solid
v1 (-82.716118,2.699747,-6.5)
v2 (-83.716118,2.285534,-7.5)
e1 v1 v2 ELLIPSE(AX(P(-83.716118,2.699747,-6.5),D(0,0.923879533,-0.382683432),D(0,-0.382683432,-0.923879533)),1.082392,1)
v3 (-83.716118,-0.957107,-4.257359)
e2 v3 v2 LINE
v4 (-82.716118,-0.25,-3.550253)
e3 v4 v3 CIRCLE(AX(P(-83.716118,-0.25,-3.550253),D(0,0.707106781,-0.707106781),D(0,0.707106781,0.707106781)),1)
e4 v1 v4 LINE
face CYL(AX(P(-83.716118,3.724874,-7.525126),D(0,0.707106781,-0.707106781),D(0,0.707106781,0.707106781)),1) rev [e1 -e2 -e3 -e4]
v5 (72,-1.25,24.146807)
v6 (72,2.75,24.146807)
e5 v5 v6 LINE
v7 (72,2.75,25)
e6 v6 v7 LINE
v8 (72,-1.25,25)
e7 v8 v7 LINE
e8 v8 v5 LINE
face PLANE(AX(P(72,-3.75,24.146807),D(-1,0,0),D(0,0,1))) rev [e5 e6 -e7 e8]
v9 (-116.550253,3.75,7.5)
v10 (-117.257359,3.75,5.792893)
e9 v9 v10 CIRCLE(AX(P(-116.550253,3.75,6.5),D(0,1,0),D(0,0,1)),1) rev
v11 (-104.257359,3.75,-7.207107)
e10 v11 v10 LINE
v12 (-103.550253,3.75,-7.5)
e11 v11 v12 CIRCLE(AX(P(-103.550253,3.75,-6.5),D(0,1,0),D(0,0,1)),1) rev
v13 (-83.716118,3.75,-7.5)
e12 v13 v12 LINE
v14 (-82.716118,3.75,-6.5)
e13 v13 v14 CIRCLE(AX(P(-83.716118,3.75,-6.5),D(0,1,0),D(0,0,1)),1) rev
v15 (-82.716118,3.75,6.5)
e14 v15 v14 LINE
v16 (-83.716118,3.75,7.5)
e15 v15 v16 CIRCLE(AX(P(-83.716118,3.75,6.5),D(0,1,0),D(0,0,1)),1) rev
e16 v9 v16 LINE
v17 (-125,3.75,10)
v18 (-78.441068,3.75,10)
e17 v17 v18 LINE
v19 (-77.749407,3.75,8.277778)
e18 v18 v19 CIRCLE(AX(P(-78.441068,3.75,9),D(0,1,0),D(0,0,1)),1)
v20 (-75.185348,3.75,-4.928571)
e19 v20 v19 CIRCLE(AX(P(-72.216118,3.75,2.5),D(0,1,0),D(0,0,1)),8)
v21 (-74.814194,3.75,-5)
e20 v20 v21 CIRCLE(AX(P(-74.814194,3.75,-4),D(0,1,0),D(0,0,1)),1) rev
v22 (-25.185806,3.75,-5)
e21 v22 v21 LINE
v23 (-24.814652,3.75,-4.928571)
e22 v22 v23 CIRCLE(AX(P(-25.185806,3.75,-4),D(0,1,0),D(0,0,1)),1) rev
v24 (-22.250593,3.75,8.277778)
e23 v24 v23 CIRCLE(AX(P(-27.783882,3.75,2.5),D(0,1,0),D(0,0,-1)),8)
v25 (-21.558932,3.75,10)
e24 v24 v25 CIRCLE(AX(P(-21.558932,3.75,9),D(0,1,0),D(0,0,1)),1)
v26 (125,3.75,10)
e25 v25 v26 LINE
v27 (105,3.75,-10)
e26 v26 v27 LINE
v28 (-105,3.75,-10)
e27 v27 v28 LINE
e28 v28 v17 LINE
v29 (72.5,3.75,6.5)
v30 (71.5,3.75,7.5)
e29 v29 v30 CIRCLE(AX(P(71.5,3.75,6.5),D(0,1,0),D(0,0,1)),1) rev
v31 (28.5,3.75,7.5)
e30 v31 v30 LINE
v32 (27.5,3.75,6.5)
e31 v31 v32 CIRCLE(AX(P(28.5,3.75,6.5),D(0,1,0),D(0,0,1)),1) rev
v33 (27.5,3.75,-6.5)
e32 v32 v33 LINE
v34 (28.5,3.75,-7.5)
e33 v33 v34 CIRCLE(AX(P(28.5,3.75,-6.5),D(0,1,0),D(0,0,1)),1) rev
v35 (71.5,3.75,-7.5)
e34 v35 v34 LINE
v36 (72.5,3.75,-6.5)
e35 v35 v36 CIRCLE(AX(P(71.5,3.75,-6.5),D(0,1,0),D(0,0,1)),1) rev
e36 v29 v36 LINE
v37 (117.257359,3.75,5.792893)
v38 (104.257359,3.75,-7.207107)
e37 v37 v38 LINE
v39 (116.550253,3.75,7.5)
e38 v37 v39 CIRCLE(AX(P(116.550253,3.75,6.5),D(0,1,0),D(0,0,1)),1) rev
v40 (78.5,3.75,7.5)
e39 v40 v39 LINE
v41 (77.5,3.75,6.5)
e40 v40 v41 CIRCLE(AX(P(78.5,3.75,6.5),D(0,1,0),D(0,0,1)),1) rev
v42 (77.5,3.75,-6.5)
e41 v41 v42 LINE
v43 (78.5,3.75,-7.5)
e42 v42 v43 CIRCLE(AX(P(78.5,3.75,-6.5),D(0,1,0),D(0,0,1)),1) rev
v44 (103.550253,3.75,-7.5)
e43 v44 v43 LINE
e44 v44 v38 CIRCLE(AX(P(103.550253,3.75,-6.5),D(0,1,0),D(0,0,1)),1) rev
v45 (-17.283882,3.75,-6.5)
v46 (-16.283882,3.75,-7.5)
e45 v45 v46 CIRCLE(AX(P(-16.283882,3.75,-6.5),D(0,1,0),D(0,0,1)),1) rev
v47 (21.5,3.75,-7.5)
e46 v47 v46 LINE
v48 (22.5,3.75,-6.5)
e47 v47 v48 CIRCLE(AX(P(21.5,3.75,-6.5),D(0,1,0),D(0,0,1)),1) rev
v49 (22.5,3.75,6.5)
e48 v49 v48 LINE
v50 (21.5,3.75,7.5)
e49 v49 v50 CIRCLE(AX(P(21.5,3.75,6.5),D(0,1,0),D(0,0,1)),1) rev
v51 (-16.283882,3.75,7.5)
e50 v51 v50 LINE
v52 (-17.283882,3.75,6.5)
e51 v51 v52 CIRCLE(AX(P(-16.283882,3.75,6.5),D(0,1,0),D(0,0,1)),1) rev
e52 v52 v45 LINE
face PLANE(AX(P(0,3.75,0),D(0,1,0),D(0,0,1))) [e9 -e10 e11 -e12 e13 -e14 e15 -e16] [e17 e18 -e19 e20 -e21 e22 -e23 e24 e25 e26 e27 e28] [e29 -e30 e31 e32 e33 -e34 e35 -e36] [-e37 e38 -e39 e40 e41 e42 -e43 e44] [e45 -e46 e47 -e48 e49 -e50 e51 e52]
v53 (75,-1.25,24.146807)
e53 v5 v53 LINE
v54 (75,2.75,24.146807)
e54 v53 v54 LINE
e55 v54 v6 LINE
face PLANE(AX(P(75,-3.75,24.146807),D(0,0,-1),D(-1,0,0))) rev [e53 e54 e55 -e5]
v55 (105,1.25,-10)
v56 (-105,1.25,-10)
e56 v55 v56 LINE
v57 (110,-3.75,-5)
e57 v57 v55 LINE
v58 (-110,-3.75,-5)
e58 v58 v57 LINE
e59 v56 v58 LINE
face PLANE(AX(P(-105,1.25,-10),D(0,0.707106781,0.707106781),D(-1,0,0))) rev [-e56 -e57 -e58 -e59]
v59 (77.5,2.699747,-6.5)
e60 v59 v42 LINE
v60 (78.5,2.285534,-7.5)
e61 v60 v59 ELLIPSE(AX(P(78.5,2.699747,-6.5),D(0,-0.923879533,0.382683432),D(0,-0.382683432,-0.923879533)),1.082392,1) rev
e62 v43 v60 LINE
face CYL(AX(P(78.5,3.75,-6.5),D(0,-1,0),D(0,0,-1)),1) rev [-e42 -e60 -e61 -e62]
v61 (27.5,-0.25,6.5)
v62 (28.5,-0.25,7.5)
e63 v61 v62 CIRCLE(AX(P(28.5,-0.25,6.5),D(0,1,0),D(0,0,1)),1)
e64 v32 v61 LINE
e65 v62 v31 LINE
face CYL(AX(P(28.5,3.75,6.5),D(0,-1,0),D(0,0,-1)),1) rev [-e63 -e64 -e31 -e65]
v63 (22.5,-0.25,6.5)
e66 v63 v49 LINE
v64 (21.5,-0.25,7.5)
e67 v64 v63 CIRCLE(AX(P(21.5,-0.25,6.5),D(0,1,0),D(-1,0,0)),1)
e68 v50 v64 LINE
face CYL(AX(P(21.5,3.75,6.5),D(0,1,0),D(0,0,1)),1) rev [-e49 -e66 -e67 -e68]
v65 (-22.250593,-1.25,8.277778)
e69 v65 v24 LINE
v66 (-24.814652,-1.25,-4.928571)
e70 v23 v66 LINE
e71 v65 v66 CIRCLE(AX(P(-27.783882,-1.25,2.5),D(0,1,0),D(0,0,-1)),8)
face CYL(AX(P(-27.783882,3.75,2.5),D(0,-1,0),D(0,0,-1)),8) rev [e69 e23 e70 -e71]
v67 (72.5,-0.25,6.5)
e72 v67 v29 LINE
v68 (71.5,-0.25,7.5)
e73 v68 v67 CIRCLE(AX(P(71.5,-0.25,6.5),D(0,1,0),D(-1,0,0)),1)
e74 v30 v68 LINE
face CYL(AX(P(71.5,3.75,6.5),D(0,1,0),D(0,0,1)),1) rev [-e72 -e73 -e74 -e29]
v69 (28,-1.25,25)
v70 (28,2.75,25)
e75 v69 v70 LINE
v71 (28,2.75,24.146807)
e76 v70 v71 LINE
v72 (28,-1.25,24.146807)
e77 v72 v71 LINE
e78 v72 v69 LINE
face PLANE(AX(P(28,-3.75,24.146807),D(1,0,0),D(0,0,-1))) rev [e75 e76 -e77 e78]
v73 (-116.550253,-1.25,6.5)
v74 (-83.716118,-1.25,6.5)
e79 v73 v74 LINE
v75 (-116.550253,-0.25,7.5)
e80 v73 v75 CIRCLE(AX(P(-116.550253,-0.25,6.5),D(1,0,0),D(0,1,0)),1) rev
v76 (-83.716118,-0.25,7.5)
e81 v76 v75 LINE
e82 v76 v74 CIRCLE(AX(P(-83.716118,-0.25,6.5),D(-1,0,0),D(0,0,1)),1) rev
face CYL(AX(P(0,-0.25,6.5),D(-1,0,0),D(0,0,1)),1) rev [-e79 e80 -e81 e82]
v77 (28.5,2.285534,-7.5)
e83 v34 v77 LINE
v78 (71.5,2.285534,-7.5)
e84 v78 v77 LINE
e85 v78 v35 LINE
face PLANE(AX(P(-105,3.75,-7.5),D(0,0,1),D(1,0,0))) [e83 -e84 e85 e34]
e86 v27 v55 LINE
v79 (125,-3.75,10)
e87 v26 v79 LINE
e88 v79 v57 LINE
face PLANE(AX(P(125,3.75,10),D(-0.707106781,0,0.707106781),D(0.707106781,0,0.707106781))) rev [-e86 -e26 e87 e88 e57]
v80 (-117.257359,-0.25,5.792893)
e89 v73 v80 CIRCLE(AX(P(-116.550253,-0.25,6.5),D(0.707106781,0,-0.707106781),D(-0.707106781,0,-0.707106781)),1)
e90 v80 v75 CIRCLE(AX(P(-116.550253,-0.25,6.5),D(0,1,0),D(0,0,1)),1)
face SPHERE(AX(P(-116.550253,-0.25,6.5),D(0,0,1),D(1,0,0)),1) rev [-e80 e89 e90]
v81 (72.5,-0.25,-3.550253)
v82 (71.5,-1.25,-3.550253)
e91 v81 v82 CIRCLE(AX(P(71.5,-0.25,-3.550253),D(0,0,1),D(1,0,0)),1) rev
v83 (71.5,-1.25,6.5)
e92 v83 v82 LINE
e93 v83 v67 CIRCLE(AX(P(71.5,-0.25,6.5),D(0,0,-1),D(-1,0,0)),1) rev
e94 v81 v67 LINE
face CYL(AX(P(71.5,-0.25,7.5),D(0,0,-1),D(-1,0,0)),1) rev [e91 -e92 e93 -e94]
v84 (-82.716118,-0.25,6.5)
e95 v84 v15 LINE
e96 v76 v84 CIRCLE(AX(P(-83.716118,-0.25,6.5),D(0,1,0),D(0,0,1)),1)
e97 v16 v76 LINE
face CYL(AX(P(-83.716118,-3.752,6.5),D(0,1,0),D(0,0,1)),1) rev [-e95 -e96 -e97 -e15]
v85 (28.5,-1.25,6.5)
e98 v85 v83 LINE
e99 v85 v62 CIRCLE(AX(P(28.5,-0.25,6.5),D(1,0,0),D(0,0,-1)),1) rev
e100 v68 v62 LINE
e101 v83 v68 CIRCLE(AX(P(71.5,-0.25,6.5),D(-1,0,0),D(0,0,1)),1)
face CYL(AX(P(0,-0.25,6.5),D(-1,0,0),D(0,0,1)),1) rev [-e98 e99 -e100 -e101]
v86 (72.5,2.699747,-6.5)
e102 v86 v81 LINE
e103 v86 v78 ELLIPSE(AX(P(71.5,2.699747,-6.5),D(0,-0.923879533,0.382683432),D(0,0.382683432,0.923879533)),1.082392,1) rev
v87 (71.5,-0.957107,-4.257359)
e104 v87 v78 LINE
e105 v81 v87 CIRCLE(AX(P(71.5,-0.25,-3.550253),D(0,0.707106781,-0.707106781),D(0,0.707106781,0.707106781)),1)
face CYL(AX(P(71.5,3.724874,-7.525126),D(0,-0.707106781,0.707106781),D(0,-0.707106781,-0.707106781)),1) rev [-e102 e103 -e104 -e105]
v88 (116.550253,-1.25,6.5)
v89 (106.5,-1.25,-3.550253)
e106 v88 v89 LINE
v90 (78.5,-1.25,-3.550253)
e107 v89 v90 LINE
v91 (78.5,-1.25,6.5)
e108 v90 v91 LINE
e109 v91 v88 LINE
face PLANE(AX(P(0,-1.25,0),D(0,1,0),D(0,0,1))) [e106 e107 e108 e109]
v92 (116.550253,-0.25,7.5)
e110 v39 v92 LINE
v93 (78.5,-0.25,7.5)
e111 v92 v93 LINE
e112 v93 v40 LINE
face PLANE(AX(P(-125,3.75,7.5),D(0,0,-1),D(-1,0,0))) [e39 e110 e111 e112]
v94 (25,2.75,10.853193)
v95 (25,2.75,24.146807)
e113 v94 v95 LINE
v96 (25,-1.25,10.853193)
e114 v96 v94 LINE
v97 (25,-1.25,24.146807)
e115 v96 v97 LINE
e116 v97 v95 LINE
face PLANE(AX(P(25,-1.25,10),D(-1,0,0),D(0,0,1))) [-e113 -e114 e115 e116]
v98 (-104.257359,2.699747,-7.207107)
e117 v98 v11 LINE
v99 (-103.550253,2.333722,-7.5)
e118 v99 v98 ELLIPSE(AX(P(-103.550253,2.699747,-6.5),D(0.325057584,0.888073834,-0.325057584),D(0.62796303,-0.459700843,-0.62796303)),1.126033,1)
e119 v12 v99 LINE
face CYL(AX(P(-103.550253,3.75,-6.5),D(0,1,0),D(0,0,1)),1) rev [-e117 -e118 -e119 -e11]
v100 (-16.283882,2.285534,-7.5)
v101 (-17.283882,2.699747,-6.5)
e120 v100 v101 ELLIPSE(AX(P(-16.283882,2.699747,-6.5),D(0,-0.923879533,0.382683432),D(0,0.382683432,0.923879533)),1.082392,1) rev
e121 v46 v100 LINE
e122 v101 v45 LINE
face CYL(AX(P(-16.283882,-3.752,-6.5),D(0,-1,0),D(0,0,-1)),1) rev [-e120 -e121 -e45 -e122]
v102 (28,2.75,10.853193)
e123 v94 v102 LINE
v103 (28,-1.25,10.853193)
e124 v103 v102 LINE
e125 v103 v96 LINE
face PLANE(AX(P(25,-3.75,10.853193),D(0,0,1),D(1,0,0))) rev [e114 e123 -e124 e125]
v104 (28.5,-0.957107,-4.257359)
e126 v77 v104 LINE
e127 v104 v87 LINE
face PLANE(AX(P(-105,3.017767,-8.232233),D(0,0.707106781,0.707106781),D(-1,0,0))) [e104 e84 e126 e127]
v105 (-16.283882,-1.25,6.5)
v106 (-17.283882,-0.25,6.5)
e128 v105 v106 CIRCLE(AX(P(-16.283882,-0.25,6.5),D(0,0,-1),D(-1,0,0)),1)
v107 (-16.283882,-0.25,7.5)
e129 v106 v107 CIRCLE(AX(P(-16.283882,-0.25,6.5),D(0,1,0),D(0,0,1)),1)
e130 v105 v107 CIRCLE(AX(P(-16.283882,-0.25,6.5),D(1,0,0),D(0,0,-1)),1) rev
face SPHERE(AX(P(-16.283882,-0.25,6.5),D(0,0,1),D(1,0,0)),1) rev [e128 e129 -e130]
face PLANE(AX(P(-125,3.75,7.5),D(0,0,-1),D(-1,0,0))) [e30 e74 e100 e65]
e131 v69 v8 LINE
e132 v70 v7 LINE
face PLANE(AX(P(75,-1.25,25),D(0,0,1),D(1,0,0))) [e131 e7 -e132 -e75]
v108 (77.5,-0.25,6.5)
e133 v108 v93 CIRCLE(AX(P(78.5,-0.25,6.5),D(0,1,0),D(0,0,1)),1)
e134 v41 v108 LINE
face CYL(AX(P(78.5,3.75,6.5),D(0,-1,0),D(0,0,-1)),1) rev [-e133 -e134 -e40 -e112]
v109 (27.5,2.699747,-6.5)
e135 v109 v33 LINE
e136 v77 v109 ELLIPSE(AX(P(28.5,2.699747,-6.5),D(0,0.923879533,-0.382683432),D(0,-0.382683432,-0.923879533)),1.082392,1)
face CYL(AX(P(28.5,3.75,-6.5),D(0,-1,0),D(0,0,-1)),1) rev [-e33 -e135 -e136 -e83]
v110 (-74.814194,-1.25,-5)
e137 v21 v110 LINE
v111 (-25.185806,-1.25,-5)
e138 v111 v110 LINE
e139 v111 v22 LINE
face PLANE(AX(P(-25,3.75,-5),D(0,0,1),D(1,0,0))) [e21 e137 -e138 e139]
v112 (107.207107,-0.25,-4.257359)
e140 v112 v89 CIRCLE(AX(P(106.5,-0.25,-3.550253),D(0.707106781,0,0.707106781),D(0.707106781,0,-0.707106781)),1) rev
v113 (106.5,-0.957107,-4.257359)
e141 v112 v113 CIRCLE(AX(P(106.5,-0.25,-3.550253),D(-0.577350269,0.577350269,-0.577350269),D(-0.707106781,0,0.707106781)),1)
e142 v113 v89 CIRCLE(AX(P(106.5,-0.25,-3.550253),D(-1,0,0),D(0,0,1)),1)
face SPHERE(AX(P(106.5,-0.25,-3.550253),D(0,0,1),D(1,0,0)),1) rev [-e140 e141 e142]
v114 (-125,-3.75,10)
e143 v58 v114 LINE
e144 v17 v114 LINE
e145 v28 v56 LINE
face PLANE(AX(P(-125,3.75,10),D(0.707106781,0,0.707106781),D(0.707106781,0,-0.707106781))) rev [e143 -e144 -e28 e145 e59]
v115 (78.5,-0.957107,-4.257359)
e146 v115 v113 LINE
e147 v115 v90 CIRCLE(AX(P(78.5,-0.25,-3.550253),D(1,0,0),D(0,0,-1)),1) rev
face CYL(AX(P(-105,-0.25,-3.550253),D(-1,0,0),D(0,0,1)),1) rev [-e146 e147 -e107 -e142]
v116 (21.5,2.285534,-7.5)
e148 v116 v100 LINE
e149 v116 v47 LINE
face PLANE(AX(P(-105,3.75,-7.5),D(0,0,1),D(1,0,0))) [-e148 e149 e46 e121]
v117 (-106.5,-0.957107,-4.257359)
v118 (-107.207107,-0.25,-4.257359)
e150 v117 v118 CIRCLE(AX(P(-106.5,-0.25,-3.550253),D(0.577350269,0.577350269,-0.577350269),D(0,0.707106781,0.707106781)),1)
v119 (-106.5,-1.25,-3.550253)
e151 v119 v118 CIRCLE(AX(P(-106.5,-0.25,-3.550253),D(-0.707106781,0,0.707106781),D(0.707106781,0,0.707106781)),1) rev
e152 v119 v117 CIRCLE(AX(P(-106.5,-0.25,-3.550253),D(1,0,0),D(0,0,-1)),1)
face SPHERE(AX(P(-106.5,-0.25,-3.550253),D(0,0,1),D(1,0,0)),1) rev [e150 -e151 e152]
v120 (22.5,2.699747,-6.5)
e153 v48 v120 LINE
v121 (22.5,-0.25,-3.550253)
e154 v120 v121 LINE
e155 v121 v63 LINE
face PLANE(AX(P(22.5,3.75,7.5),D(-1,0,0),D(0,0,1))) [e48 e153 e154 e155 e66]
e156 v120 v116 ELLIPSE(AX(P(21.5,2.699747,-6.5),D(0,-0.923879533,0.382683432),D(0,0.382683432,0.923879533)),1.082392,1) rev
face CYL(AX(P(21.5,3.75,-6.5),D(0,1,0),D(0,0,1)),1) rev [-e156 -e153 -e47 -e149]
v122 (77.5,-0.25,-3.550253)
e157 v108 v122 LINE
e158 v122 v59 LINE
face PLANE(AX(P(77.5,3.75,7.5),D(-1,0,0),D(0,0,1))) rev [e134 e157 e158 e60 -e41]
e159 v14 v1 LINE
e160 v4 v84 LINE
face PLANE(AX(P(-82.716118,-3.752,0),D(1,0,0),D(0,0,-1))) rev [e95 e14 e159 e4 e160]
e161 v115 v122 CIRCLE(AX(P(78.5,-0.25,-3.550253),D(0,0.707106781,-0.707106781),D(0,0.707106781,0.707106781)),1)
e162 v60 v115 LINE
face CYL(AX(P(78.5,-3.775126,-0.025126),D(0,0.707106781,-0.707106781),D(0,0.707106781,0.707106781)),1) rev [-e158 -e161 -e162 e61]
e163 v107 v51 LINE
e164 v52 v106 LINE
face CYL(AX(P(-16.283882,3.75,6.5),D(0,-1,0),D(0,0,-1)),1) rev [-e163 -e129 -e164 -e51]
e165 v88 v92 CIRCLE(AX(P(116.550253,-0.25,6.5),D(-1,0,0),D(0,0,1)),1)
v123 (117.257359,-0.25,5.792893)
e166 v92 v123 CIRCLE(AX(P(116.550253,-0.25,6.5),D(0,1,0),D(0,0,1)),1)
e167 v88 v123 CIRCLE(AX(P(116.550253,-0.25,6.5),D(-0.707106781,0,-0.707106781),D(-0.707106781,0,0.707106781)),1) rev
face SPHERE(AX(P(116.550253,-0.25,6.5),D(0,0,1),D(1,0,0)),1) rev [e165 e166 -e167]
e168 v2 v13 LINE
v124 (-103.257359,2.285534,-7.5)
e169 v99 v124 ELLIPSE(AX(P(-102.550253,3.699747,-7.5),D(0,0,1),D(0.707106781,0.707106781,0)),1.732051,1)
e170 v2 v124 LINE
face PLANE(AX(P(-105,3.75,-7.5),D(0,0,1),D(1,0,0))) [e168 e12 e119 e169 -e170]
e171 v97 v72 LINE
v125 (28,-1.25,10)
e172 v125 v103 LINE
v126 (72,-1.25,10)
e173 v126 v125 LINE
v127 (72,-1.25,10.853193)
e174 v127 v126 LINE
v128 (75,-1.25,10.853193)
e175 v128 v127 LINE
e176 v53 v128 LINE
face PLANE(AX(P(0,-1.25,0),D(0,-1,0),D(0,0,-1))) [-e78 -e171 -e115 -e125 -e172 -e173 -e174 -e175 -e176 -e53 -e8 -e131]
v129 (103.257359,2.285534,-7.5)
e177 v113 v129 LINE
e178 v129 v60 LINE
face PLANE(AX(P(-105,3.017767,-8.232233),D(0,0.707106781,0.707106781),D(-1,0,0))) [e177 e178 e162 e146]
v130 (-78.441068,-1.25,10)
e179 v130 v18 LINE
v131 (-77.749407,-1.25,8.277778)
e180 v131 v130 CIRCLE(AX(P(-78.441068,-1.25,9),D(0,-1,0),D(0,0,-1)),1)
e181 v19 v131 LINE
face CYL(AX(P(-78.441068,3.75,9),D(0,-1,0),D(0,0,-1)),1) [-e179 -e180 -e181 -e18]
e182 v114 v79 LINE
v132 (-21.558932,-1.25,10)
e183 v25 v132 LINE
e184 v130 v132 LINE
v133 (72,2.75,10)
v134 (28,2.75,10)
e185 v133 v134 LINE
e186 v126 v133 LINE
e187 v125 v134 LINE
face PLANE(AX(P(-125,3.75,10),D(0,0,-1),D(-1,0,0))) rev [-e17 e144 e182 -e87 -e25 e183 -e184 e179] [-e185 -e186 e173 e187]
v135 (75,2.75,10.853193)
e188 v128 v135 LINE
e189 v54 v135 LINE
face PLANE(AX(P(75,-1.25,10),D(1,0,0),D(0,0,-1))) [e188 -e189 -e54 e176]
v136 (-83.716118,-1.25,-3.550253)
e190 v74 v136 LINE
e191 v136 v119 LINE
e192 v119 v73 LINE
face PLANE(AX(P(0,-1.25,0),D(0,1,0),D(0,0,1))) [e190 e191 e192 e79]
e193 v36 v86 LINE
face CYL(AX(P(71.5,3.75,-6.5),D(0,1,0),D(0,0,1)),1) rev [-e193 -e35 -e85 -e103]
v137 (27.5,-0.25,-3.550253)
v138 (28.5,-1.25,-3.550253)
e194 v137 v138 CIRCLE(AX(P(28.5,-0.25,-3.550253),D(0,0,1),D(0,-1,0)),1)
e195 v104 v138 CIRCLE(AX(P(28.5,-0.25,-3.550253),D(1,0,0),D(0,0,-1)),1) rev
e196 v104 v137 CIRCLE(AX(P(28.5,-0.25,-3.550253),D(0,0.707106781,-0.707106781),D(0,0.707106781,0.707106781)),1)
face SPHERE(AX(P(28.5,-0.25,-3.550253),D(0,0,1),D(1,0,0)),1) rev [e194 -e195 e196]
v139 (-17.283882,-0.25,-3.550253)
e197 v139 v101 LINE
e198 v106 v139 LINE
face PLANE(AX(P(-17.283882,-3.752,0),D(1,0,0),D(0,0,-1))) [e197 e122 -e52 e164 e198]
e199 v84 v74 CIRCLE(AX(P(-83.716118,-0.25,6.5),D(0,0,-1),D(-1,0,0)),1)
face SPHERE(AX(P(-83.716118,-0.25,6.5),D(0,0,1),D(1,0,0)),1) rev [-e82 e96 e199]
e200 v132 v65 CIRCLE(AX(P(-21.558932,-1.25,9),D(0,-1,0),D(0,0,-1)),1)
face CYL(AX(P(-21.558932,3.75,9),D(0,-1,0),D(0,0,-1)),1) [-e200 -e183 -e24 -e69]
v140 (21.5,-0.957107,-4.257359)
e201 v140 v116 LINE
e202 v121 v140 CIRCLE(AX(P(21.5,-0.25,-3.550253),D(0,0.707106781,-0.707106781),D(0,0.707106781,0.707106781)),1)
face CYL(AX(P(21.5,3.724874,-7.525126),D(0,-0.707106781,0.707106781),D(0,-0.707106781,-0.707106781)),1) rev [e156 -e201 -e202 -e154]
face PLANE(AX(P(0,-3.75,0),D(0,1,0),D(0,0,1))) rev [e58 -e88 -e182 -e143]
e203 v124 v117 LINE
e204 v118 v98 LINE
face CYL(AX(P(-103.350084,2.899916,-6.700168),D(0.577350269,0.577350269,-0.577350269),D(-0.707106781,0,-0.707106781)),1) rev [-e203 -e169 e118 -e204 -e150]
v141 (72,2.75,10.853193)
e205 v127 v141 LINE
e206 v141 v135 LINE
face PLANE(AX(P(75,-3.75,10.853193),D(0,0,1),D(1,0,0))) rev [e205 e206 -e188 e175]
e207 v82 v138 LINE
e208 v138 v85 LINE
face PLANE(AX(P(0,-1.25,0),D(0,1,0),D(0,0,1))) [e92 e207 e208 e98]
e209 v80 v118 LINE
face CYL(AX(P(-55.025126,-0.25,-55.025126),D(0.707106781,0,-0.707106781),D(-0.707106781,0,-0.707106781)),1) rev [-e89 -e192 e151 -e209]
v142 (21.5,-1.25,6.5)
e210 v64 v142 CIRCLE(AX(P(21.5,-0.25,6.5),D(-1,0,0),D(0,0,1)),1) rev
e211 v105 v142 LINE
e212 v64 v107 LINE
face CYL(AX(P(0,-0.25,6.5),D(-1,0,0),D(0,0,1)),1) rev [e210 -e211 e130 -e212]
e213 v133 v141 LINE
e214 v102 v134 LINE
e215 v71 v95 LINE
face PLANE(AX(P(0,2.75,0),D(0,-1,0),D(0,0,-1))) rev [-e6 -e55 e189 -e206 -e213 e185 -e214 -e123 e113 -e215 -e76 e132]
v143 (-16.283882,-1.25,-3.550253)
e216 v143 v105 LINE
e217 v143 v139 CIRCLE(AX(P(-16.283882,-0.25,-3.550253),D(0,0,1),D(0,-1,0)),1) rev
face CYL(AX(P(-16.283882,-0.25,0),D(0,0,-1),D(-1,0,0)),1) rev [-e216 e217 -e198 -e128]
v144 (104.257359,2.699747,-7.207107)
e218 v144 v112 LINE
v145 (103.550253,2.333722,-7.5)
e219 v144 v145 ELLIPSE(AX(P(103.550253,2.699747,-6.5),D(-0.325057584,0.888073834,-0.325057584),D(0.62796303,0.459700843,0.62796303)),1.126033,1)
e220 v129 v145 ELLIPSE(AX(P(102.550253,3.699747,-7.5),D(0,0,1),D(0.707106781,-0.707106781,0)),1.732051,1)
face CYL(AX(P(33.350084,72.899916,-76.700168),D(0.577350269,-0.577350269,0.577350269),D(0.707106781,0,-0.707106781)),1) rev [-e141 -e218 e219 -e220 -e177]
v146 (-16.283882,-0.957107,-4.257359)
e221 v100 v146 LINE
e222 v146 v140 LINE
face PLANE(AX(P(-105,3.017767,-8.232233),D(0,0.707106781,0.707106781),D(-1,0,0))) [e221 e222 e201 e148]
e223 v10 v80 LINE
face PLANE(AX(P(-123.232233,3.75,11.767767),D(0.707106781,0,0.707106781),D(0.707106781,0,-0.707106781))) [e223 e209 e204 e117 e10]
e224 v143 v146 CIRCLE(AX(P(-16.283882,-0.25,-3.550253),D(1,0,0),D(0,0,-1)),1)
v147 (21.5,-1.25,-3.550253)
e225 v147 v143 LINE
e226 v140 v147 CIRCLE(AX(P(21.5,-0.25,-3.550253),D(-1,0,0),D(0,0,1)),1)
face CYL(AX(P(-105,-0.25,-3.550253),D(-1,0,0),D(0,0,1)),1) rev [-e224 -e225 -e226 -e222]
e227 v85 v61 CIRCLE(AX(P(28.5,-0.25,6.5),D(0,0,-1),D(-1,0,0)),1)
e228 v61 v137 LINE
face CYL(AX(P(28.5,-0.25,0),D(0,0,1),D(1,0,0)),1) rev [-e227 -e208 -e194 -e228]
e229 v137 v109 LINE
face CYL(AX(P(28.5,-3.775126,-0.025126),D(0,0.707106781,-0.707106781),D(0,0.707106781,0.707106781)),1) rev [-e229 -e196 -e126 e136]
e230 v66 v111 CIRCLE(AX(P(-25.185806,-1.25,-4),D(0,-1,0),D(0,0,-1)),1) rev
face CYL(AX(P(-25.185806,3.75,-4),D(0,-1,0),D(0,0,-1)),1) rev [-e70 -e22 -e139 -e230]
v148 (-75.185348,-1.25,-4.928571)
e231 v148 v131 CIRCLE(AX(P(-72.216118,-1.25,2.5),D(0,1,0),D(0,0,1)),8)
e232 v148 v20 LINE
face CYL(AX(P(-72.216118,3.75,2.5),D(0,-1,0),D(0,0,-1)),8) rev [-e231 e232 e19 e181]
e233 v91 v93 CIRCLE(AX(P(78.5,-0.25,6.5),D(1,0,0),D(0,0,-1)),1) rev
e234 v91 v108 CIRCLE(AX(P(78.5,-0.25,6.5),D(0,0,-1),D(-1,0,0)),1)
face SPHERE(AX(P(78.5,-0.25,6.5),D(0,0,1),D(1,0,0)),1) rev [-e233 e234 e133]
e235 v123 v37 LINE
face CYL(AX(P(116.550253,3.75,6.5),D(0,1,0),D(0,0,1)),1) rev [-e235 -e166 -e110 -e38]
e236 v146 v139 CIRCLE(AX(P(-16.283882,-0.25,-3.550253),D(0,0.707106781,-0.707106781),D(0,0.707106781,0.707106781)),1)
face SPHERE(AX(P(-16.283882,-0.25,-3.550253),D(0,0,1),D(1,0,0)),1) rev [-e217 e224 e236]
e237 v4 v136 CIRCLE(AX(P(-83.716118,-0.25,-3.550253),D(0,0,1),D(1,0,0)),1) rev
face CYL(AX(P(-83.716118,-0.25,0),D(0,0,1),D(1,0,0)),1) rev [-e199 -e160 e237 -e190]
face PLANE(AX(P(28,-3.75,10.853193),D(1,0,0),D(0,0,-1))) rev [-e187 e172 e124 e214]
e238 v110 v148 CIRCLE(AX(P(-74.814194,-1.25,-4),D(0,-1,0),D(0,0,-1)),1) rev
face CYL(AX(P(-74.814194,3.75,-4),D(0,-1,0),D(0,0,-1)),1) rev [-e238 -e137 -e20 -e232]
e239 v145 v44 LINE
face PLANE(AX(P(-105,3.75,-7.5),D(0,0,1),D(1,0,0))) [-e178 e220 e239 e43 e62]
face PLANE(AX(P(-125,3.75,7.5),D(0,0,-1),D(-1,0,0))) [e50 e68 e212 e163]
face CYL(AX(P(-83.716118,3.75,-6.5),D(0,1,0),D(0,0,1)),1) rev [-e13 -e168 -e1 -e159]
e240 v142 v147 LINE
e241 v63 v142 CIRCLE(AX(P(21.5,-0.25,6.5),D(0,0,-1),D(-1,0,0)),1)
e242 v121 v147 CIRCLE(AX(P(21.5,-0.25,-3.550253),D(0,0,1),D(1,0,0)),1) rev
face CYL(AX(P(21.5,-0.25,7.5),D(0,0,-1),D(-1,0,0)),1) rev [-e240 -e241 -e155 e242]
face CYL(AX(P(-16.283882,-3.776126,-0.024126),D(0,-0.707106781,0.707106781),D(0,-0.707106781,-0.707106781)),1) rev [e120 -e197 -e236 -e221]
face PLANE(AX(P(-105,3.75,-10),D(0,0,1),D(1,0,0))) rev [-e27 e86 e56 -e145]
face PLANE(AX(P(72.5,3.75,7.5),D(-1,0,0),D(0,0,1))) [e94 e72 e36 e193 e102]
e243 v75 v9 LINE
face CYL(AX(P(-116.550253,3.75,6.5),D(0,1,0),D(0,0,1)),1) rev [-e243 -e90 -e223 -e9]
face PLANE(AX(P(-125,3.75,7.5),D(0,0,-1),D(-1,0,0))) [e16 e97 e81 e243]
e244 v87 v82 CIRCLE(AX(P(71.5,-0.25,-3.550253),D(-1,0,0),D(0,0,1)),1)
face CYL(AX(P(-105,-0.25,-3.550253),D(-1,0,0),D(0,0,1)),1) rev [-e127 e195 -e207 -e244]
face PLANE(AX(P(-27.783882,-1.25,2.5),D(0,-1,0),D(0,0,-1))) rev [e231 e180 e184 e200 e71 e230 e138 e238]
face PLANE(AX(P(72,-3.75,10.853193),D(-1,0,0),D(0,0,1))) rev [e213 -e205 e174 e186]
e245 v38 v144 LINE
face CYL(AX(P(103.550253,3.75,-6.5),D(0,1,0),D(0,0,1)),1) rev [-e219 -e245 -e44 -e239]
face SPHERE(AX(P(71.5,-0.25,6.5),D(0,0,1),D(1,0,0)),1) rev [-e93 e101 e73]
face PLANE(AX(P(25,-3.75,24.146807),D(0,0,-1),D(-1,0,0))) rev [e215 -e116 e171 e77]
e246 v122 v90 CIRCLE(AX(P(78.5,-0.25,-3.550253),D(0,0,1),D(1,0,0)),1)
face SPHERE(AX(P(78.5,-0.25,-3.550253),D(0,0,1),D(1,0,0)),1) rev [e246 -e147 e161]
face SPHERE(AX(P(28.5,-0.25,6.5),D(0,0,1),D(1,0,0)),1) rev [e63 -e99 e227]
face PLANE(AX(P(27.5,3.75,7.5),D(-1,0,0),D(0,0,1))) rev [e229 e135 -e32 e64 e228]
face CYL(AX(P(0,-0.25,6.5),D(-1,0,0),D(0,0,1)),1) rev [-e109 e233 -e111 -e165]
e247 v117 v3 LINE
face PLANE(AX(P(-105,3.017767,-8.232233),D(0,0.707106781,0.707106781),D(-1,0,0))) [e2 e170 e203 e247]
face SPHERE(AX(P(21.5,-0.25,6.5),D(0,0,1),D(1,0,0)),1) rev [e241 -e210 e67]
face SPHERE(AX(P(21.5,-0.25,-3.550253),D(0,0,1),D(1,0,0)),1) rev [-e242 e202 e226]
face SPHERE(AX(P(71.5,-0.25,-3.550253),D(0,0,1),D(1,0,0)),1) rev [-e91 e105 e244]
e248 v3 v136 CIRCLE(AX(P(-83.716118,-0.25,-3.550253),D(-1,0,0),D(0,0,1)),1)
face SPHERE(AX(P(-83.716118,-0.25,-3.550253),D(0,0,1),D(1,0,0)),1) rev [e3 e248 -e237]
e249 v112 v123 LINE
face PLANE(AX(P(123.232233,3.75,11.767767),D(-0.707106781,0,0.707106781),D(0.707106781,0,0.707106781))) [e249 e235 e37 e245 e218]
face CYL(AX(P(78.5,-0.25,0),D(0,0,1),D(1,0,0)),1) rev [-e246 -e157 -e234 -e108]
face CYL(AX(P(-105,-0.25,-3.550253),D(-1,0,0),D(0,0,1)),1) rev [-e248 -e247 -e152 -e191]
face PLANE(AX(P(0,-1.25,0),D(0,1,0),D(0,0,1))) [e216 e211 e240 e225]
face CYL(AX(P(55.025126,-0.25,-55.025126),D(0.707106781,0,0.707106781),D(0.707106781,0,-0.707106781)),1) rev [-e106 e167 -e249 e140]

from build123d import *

# Parameters (mm, degrees)
BOSS_EXTRUDE1_DEPTH     = 3.75
SKETCH3_W               = 50
SKETCH3_H               = 15
BOSS_EXTRUDE3_DEPTH     = 4
CUT_EXTRUDE1_DEPTH      = 128.641098397
CUT_EXTRUDE1_DEPTH_BACK = 4
CHAMFER1_SIZE           = 5
SKETCH7_W               = 3
SKETCH7_H               = 0.853193318
CUT_EXTRUDE2_DEPTH      = 128.641098397
SHELL1_START            = -17.283882181
SHELL1_DEPTH            = 121.248348275
SHELL1_START_2          = -103.964466094
SHELL1_2_DEPTH          = 21.248348275
SHELL1_START_3          = -118.964466094
SHELL1_3_DEPTH          = 43.546786157
SHELL1_START_4          = -24.582320063
SHELL1_4_DEPTH          = 143.546786157
SHELL1_START_5          = -1.25
SHELL1_5_DEPTH          = 5
BOSS_EXTRUDE4_REACH     = 129.696
RIB1_REACH              = 129.696
SKETCH5_WALLS_W         = 5
SKETCH5_WALLS_H         = 272.391855782
FILLET1_R               = 1
FILLET3_R               = 1


with BuildPart() as part:
    # Sketch1 → Boss-Extrude1 (new, symmetric)
    with BuildSketch(Plane(origin=(0, 0, 0), x_dir=(1, 0, 0), z_dir=(0, 1, 0))):
        Polygon((-125, -10), (125, -10), (105, 10), (-105, 10), align=None)
    extrude(amount=BOSS_EXTRUDE1_DEPTH, both=True)

    # Sketch3 → Boss-Extrude3 (add)
    with BuildSketch(Plane(origin=(0, 2.75, 0), x_dir=(-1, 0, 0), z_dir=(0, 1, 0))):
        with Locations((-50, 17.5)):
            Rectangle(SKETCH3_W, SKETCH3_H)
    extrude(amount=-BOSS_EXTRUDE3_DEPTH)

    # Sketch4 → Cut-Extrude1 (cut, two sides: drawn at the far end of the back side and taken through both)
    with BuildSketch(Plane(origin=(0, 2.75, 0), x_dir=(-1, 0, 0), z_dir=(0, 1, 0)).offset(-CUT_EXTRUDE1_DEPTH_BACK)):
        with BuildLine():
            Line((75, 10), (25, 10))
            ThreePointArc((25, 10), (19.783882181, 2.5), (25, -5))
            Line((25, -5), (75, -5))
            ThreePointArc((75, -5), (80.216117819, 2.5), (75, 10))
        make_face()
    extrude(amount=CUT_EXTRUDE1_DEPTH + CUT_EXTRUDE1_DEPTH_BACK, mode=Mode.SUBTRACT)

    # Chamfer1
    chamfer1_edges = [part.edges().sort_by_distance(p)[0] for p in [
        (0, -3.75, -10),
    ]]
    chamfer(chamfer1_edges, length=CHAMFER1_SIZE)

    # Sketch7 → Cut-Extrude2 (cut, through all)
    with BuildSketch(Plane(origin=(0, 2.75, 0), x_dir=(-1, 0, 0), z_dir=(0, 1, 0))):
        with Locations((-73.5, 24.573403341)):
            Rectangle(SKETCH7_W, SKETCH7_H)
        with Locations((-73.5, 10.426596659)):
            Rectangle(SKETCH7_W, SKETCH7_H)
        with Locations((-26.5, 10.426596659)):
            Rectangle(SKETCH7_W, SKETCH7_H)
        with Locations((-26.5, 24.573403341)):
            Rectangle(SKETCH7_W, SKETCH7_H)
    extrude(amount=-CUT_EXTRUDE2_DEPTH, mode=Mode.SUBTRACT)

    # Shell1: read off the stored shape, not the designer's step
    # Shell1 outline → Shell1 (cut)
    with BuildSketch(Plane.YZ.offset(SHELL1_START)):
        Polygon((-1.25, 7.5), (-1.25, -3.964466094), (2.285533906, -7.5), (3.75, -7.5), (3.75, 7.5), align=None)
    extrude(amount=SHELL1_DEPTH, mode=Mode.SUBTRACT)

    # Shell1 2 outline → Shell1 2 (cut)
    with BuildSketch(Plane.YZ.offset(SHELL1_START_2)):
        Polygon((-1.25, 7.5), (-1.25, -3.964466094), (2.285533906, -7.5), (3.75, -7.5), (3.75, 7.5), align=None)
    extrude(amount=SHELL1_2_DEPTH, mode=Mode.SUBTRACT)

    # Shell1 3 outline → Shell1 3 (cut)
    with BuildSketch(Plane.YZ.offset(SHELL1_START_3)):
        Polygon((-1.25, 7.5), (-1.25, -3.964466094), (2.285533906, -7.5), (3.75, -7.5), (3.75, 7.5), align=None)
    extrude(amount=SHELL1_3_DEPTH, mode=Mode.SUBTRACT)

    # Shell1 4 outline → Shell1 4 (cut)
    with BuildSketch(Plane.YZ.offset(SHELL1_START_4)):
        Polygon((-1.25, 7.5), (-1.25, -3.964466094), (2.285533906, -7.5), (3.75, -7.5), (3.75, 7.5), align=None)
    extrude(amount=SHELL1_4_DEPTH, mode=Mode.SUBTRACT)

    # Shell1 5 outline → Shell1 5 (add)
    with BuildSketch(Plane(origin=(0, 0, 0), x_dir=(1, 0, 0), z_dir=(0, 1, 0)).offset(SHELL1_START_5)):
        Polygon((-107.5, 7.5), (-118.964466094, -3.964466094), (-118.964466094, -7.5), (-103.964466094, 7.5), align=None)
        with BuildLine():
            ThreePointArc((-75.417679937, 7.5), (-81.958045751, 1.417249055), (-81.449210475, -7.5))
            Line((-81.449210475, -7.5), (-78.461115817, -7.5))
            ThreePointArc((-78.461115817, -7.5), (-79.983065249, -0.58309426), (-75.417679937, 4.831439149))
            Line((-75.417679937, 4.831439149), (-75.417679937, 7.5))
        make_face()
        Polygon((118.964466094, -3.964466094), (107.5, 7.5), (103.964466094, 7.5), (118.964466094, -7.5), align=None)
        with BuildLine():
            ThreePointArc((-18.550789525, -7.5), (-18.041954249, 1.417249055), (-24.582320063, 7.5))
            Line((-24.582320063, 7.5), (-24.582320063, 4.831439149))
            ThreePointArc((-24.582320063, 4.831439149), (-20.016934751, -0.58309426), (-21.538884183, -7.5))
            Line((-21.538884183, -7.5), (-18.550789525, -7.5))
        make_face()
    extrude(amount=SHELL1_5_DEPTH)

    # Sketch6 → Boss-Extrude4 (add, up to next)
    with BuildSketch(Plane.XZ.offset(-3.75), mode=Mode.PRIVATE) as boss_extrude4_sk1:
        with BuildLine():
            Line((-17.283882181, -7.5), (-17.283882181, 2.500000029))
            ThreePointArc((-17.283882181, 2.500000029), (-19.302537873, -3.69005644), (-24.582320063, -7.5))
            Line((-24.582320063, -7.5), (-17.283882181, -7.5))
        make_face()
    boss_extrude4_tool1 = extrude(boss_extrude4_sk1.sketch, amount=BOSS_EXTRUDE4_REACH, mode=Mode.PRIVATE) - part.part
    # Sketch6 → Boss-Extrude4 (add, up to next)
    with BuildSketch(Plane.XZ.offset(-3.75), mode=Mode.PRIVATE) as boss_extrude4_sk2:
        with BuildLine():
            Line((-17.283882181, 2.500000029), (-17.283882181, 7.5))
            Line((-17.283882181, 7.5), (-18.550789525, 7.5))
            ThreePointArc((-18.550789525, 7.5), (-17.605535736, 5.079004387), (-17.283882181, 2.500000029))
        make_face()
    boss_extrude4_tool2 = extrude(boss_extrude4_sk2.sketch, amount=BOSS_EXTRUDE4_REACH, mode=Mode.PRIVATE) - part.part
    # Sketch6 → Boss-Extrude4 (add, up to next)
    with BuildSketch(Plane.XZ.offset(-3.75), mode=Mode.PRIVATE) as boss_extrude4_sk3:
        with BuildLine():
            Line((-82.716117819, 7.5), (-82.716117819, 2.499999956))
            ThreePointArc((-82.716117819, 2.499999956), (-82.394464273, 5.079004351), (-81.449210475, 7.5))
            Line((-81.449210475, 7.5), (-82.716117819, 7.5))
        make_face()
    boss_extrude4_tool3 = extrude(boss_extrude4_sk3.sketch, amount=BOSS_EXTRUDE4_REACH, mode=Mode.PRIVATE) - part.part
    # Sketch6 → Boss-Extrude4 (add, up to next)
    with BuildSketch(Plane.XZ.offset(-3.75), mode=Mode.PRIVATE) as boss_extrude4_sk4:
        with BuildLine():
            Line((-82.716117819, -7.5), (-75.417679937, -7.5))
            ThreePointArc((-75.417679937, -7.5), (-80.697462105, -3.69005647), (-82.716117819, 2.499999956))
            Line((-82.716117819, 2.499999956), (-82.716117819, -7.5))
        make_face()
    boss_extrude4_tool4 = extrude(boss_extrude4_sk4.sketch, amount=BOSS_EXTRUDE4_REACH, mode=Mode.PRIVATE) - part.part
    add(boss_extrude4_tool1.solids().sort_by_distance((-19.229077, 3.75, -5.202593))[0])
    add(boss_extrude4_tool2.solids().sort_by_distance((-17.659672, 3.75, 6.265582))[0])
    add(boss_extrude4_tool3.solids().sort_by_distance((-82.340328, 3.75, 6.265582))[0])
    add(boss_extrude4_tool4.solids().sort_by_distance((-80.770923, 3.75, -5.202593))[0])

    # Sketch5 walls → Rib1 (add, up to next)
    with BuildSketch(Plane.XZ.offset(-3.75), mode=Mode.PRIVATE) as rib1_sk1:
        with Locations((75, 0)):
            Rectangle(SKETCH5_WALLS_W, SKETCH5_WALLS_H)
    rib1_tool1 = extrude(rib1_sk1.sketch, amount=RIB1_REACH, mode=Mode.PRIVATE) - part.part
    # Sketch5 walls → Rib1 (add, up to next)
    with BuildSketch(Plane.XZ.offset(-3.75), mode=Mode.PRIVATE) as rib1_sk2:
        with Locations((25, 0)):
            Rectangle(SKETCH5_WALLS_W, SKETCH5_WALLS_H)
    rib1_tool2 = extrude(rib1_sk2.sketch, amount=RIB1_REACH, mode=Mode.PRIVATE) - part.part
    add(rib1_tool1.solids().sort_by_distance((75, 3.75, 0))[0])
    add(rib1_tool2.solids().sort_by_distance((25, 3.75, 0))[0])

    # Fillet1
    fillet1_edges = [part.edges().sort_by_distance(p)[0] for p in [
        (113.232233047, -1.25, 1.767766953),
        (105.732233047, 0.517766953, -5.732233047),
        (118.964466094, 1.25, 7.5),
        (103.964466094, 3.017766953, -7.5),
        (-103.964466094, 3.017766953, -7.5),
        (-105.732233047, 0.517766953, -5.732233047),
        (-113.232233047, -1.25, 1.767766953),
        (-100.840291956, -1.25, 7.5),
        (-118.964466094, 1.25, 7.5),
        (-95.108058909, -1.25, -3.964466094),
        (2.608058909, -1.25, -3.964466094),
        (-17.283882181, -1.25, 1.767766953),
        (-17.283882181, 0.517766953, -5.732233047),
        (-17.283882181, 3.017766953, -7.5),
        (2.608058909, -1.25, 7.5),
        (-17.283882181, 1.25, 7.5),
        (-82.716117819, -1.25, 1.767766953),
        (-82.716117819, 1.25, 7.5),
        (-82.716117819, 0.517766953, -5.732233047),
        (-82.716117819, 3.017766953, -7.5),
        (92.5, -1.25, -3.964466094),
        (77.5, 0.517766953, -5.732233047),
        (72.5, 0.517766953, -5.732233047),
        (98.232233047, -1.25, 7.5),
        (72.5, 1.25, 7.5),
        (77.5, -1.25, 1.767766953),
        (72.5, -1.25, 1.767766953),
        (72.5, 3.017766953, -7.5),
        (77.5, 1.25, 7.5),
        (77.5, 3.017766953, -7.5),
        (50, -1.25, -3.964466094),
        (27.5, 0.517766953, -5.732233047),
        (22.5, 0.517766953, -5.732233047),
        (50, -1.25, 7.5),
        (27.5, -1.25, 1.767766953),
        (22.5, 1.25, 7.5),
        (22.5, -1.25, 1.767766953),
        (22.5, 3.017766953, -7.5),
        (27.5, 1.25, 7.5),
        (27.5, 3.017766953, -7.5),
    ]]
    fillet(fillet1_edges, radius=FILLET1_R)

    # Fillet3
    fillet3_edges = [part.edges().sort_by_distance(p)[0] for p in [
        (-25, 1.25, 10),
        (-25, 1.25, -5),
        (-75, 1.25, -5),
        (-75, 1.25, 10),
    ]]
    fillet(fillet3_edges, radius=FILLET3_R)


solid = part.part
